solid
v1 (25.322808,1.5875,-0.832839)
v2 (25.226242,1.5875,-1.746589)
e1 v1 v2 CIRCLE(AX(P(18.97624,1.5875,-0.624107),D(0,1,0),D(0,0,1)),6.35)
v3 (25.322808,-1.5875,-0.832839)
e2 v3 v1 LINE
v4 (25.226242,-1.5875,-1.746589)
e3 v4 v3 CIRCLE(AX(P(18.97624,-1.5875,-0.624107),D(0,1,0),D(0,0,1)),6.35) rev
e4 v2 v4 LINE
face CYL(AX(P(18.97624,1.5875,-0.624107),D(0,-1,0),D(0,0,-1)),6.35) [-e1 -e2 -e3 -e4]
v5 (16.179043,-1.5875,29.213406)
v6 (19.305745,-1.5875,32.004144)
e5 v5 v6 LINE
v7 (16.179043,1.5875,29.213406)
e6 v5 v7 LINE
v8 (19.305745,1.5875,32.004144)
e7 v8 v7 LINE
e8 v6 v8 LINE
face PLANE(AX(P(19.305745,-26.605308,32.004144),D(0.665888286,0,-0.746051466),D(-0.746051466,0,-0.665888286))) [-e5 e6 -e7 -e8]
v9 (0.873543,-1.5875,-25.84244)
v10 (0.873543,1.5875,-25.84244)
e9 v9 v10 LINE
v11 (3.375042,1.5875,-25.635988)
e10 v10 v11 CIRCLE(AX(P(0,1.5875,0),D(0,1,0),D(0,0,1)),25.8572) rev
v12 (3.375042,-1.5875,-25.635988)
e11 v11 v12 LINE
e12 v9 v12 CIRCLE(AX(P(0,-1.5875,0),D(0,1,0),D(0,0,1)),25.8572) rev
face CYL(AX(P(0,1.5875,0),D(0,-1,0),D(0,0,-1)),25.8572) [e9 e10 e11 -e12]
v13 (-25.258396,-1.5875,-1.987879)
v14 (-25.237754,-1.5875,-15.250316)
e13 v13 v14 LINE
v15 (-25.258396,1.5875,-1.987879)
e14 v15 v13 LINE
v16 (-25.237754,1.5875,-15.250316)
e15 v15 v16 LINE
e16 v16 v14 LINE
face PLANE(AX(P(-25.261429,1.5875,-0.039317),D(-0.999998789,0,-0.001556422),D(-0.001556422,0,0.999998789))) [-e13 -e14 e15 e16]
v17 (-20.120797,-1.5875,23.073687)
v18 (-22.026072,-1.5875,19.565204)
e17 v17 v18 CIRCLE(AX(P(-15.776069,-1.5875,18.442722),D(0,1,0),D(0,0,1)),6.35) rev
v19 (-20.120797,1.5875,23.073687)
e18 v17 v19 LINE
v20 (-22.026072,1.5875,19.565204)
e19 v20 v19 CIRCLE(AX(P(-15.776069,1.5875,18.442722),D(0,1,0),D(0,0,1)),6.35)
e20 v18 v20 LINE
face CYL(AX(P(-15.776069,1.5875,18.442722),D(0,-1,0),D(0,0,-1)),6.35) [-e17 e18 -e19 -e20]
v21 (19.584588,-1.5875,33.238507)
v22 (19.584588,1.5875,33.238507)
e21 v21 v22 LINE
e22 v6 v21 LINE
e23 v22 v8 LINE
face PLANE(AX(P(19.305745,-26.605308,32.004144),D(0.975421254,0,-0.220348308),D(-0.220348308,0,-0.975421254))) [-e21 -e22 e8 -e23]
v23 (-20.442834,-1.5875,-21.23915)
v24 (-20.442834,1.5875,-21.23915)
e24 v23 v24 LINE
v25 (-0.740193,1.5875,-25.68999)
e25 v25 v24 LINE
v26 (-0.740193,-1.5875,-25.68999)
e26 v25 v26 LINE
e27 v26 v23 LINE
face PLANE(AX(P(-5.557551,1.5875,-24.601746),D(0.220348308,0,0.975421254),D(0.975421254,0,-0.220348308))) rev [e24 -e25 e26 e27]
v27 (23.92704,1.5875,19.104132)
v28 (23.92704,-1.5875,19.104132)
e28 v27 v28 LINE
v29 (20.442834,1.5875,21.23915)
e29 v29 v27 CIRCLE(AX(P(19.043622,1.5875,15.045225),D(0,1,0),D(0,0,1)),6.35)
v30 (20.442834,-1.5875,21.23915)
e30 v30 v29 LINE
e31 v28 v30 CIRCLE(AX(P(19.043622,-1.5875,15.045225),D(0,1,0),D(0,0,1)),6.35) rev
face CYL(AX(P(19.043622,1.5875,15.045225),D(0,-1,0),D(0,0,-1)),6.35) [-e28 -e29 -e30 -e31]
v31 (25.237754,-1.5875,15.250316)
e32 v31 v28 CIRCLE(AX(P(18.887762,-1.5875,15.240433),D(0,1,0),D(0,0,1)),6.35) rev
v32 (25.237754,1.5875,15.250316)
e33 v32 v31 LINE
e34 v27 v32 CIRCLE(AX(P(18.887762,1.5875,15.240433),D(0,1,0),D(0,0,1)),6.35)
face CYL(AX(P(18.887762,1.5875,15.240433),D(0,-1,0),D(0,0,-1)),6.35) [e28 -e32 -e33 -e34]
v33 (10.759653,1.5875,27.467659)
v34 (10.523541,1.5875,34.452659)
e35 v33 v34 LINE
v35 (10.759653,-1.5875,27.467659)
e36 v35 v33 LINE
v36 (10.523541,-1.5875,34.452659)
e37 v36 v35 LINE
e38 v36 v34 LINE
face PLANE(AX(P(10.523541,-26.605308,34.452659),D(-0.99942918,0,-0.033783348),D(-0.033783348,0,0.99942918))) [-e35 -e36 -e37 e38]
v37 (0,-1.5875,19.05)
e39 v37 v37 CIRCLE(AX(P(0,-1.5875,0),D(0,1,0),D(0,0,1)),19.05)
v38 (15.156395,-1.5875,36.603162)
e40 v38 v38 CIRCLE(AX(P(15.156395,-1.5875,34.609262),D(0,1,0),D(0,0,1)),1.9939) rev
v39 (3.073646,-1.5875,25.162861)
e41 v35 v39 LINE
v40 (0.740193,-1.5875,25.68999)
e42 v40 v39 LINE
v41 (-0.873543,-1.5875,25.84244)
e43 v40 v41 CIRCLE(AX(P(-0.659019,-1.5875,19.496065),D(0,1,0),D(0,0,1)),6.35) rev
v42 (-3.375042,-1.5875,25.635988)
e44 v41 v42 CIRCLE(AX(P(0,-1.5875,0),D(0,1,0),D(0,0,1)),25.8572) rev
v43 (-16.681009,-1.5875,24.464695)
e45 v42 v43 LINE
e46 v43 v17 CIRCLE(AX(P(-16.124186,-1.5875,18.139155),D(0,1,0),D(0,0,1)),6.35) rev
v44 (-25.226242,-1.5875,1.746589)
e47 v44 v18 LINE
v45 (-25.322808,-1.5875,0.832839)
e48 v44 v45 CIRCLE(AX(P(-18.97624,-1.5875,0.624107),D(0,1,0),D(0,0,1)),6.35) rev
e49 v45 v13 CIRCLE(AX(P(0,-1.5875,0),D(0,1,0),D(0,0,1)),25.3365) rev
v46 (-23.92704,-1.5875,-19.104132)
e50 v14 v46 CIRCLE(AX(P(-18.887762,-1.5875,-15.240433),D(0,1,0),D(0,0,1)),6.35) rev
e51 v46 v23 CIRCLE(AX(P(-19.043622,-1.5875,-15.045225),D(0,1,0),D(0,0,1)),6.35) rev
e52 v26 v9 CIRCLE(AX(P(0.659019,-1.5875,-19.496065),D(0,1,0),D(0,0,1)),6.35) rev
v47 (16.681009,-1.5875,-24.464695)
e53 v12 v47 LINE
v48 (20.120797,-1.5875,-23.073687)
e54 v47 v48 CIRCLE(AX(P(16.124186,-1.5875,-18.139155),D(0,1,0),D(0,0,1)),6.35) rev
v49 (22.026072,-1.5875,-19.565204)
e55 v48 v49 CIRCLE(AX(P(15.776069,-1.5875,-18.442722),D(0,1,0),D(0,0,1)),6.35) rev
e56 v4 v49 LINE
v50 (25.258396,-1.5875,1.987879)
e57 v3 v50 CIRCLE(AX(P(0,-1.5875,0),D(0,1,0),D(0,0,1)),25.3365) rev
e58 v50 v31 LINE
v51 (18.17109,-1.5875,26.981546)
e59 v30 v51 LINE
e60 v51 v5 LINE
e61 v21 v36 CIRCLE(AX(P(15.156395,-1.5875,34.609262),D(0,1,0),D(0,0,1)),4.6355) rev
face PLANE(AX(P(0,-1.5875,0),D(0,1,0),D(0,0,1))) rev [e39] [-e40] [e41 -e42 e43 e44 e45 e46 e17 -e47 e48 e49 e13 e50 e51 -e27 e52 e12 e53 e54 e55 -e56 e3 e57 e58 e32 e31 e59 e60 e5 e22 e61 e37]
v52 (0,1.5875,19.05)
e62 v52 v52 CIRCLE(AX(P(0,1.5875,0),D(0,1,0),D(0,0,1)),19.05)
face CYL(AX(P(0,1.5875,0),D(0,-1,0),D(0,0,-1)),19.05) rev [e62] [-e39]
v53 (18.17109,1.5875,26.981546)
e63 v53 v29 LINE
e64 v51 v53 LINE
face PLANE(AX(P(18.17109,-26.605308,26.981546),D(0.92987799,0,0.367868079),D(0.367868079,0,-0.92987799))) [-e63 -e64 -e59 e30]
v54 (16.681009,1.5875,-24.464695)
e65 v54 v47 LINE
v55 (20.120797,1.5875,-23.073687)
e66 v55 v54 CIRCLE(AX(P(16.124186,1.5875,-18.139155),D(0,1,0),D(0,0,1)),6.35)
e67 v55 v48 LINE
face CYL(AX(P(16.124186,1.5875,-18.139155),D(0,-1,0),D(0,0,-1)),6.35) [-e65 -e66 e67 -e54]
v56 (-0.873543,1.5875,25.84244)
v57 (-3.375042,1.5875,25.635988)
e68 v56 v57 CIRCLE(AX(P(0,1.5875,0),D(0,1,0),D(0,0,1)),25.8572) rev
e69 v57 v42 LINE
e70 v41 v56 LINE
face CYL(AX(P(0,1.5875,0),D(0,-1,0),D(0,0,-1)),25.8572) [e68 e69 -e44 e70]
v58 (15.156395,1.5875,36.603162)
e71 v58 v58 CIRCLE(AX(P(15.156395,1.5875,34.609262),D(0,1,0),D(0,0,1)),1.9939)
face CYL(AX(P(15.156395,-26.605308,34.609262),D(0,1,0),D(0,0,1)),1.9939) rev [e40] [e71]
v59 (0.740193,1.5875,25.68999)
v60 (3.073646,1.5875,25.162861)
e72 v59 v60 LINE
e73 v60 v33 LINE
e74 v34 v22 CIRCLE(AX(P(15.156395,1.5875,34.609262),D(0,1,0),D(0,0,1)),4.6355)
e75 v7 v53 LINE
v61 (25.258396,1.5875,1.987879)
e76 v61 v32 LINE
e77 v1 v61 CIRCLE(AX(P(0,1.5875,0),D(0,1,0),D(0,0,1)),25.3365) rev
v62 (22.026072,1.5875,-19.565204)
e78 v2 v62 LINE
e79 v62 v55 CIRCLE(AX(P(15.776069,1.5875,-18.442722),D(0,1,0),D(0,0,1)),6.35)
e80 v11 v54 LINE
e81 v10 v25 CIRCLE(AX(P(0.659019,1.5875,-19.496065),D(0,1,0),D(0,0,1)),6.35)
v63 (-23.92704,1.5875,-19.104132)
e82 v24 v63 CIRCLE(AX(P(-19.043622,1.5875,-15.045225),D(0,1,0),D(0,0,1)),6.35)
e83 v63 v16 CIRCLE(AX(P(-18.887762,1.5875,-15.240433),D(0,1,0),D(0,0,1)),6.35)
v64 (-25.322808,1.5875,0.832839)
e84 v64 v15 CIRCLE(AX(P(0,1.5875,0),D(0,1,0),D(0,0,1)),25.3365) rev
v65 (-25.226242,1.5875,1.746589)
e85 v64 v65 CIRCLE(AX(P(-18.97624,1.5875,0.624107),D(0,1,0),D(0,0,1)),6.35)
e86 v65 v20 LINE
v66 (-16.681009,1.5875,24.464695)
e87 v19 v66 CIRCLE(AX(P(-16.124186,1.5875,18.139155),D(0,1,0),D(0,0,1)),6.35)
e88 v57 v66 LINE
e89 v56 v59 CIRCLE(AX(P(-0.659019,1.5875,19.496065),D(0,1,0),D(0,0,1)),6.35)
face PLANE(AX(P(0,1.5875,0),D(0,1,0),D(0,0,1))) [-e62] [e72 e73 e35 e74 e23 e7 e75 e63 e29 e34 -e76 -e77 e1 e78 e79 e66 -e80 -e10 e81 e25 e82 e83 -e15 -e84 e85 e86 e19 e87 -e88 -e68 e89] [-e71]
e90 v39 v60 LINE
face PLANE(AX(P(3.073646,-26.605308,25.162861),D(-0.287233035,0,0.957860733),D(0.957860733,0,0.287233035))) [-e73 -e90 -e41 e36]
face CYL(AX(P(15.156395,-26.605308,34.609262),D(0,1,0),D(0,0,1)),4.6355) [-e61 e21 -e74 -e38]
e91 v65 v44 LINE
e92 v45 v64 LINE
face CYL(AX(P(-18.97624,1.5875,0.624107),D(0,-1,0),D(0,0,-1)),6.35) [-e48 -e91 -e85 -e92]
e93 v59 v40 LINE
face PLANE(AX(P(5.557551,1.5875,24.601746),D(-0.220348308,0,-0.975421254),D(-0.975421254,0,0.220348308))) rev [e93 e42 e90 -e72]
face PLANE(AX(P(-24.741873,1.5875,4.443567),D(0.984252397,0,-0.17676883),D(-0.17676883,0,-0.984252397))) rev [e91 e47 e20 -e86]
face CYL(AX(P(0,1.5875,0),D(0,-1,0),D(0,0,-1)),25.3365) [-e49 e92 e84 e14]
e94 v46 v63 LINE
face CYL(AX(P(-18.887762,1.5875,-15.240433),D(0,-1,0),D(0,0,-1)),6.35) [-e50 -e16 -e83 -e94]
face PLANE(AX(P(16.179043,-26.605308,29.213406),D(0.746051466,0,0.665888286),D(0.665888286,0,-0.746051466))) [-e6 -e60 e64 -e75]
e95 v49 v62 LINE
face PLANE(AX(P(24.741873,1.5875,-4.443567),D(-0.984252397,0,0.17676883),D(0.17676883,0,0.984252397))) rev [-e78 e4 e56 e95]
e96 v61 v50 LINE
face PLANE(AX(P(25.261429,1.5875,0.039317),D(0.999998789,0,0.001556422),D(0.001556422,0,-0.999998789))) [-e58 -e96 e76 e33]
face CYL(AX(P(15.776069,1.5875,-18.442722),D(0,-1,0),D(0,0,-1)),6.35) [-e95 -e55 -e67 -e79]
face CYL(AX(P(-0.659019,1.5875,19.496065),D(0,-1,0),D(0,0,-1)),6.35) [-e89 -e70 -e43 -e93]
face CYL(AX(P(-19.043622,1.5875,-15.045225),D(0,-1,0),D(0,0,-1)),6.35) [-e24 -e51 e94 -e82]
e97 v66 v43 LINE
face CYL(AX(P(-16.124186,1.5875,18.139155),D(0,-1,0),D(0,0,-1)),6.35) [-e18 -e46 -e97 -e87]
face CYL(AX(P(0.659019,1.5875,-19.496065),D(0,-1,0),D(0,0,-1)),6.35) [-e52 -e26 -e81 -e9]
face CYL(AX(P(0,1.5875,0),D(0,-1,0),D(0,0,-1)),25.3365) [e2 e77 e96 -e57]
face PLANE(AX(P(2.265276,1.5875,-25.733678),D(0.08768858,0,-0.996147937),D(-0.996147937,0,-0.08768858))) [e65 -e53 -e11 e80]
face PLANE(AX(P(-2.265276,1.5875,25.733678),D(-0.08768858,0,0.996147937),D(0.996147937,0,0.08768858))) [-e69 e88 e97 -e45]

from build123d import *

# Parameters (mm, degrees)
SKETCH1_R           = 19.05
BOSS_EXTRUDE1_DEPTH = 1.5875
FILLET1_R           = 6.35
SKETCH4_R           = 1.9939
BOSS_EXTRUDE2_DEPTH = 3.175


with BuildPart() as part:
    # Sketch1 → Boss-Extrude1 (new, symmetric)
    with BuildSketch(Plane(origin=(0, 0, 0), x_dir=(1, 0, 0), z_dir=(0, 1, 0))):
        with BuildLine():
            Line((0, 25.8572), (-22.49266633, 20.776091776))
            ThreePointArc((-22.49266633, 20.776091776), (-23.925232015, 19.108880164), (-25.234496658, 17.343189053))
            Line((-25.234496658, 17.343189053), (-25.258396026, 1.987878879))
            ThreePointArc((-25.258396026, 1.987878879), (-25.334329361, 0.331644538), (-25.301777207, -1.326009955))
            Line((-25.301777207, -1.326009955), (-21.651397508, -21.651397508))
            ThreePointArc((-21.651397508, -21.651397508), (-20.188971055, -23.021109353), (-18.640092328, -24.292241274))
            Line((-18.640092328, -24.292241274), (-3.375041857, -25.63598807))
            ThreePointArc((-3.375041857, -25.63598807), (-1.691141793, -25.80183775), (0, -25.8572))
            Line((0, -25.8572), (22.49266633, -20.776091776))
            ThreePointArc((22.49266633, -20.776091776), (23.925232015, -19.108880164), (25.234496658, -17.343189053))
            Line((25.234496658, -17.343189053), (25.258396026, -1.987878879))
            ThreePointArc((25.258396026, -1.987878879), (25.334329361, -0.331644538), (25.301777207, 1.326009955))
            Line((25.301777207, 1.326009955), (21.651397508, 21.651397508))
            ThreePointArc((21.651397508, 21.651397508), (20.188971055, 23.021109353), (18.640092328, 24.292241274))
            Line((18.640092328, 24.292241274), (3.375041857, 25.63598807))
            ThreePointArc((3.375041857, 25.63598807), (1.691141793, 25.80183775), (0, 25.8572))
        make_face()
        with Locations(Location((0, 0, 0), (0, 0, 270))):
            Circle(SKETCH1_R, mode=Mode.SUBTRACT)
    extrude(amount=BOSS_EXTRUDE1_DEPTH, both=True)

    # Fillet1
    # the kernel refuses this fillet: 6.35 mm, written as the material it takes off along each edge
    with BuildSketch(Plane(origin=(25.301777207, -2.821548673, -1.326009955), x_dir=(-0.17676882960283344, 0, -0.9842523969393442), z_dir=(0, 1, 0)), Plane(origin=(-25.301777207, -2.821548673, 1.326009955), x_dir=(0.17676882960285092, 0, 0.9842523969393412), z_dir=(0, 1, 0))) as fillet1_piece_1:
        with BuildLine():
            CenterArc((0.427308397, 6.35), FILLET1_R, 261.702105294, 8.297894706)
            ThreePointArc((-0.489122596, 0.066477562), (-0.244723196, 0.032047583), (0, 0))
            Line((0, 0), (0.427308397, 0))
        make_face()
    extrude(amount=5.643097347, mode=Mode.SUBTRACT)
    with BuildSketch(Plane(origin=(0, -3.771668691, -25.8572), x_dir=(0.9998572847598118, 0, 0.016894085140560105), z_dir=(0, 1, 0))) as fillet1_piece_2:
        with BuildLine():
            CenterArc((0.766390036, -6.349093758), FILLET1_R, 89.031994173, 14.665503243)
            Line((-0.737262724, -0.179691163), (0, 0))
            ThreePointArc((0, 0), (0.436833738, 0.003690217), (0.873667477, 0))
        make_face()
    extrude(amount=7.543337383, mode=Mode.SUBTRACT)
    with BuildSketch(Plane(origin=(-22.49266633, -7.488620609, -20.776091776), x_dir=(-0.649702048384586, 0, 0.7601889556714653), z_dir=(0, 1, 0)), Plane(origin=(22.49266633, -7.488620609, 20.776091776), x_dir=(0.6497020483845872, 0, -0.7601889556714644), z_dir=(0, 1, 0))) as fillet1_piece_3:
        with BuildLine():
            CenterArc((2.115690027, 6.345281193), FILLET1_R, 233.248632952, 38.960357221)
            Line((-1.683792582, 1.257410134), (0, 0))
            ThreePointArc((0, 0), (1.180224122, -0.022754088), (2.360448244, 0))
        make_face()
    extrude(amount=14.977241219, mode=Mode.SUBTRACT)
    with BuildSketch(Plane(origin=(-25.234496658, -7.46444532, -17.343189053), x_dir=(-0.0015564217956219107, 0, 0.9999987887748636), z_dir=(0, 1, 0)), Plane(origin=(25.234496658, -7.46444532, 17.343189053), x_dir=(0.0015564217956202159, 0, -0.9999987887748636), z_dir=(0, 1, 0))) as fillet1_piece_4:
        with BuildLine():
            CenterArc((2.092875431, 6.35), FILLET1_R, 231.189304273, 38.810695727)
            ThreePointArc((-1.886982522, 1.401946779), (-0.956950246, 0.682857958), (0, 0))
            Line((0, 0), (2.092875431, 0))
        make_face()
    extrude(amount=14.928890641, mode=Mode.SUBTRACT)
    with BuildSketch(Plane(origin=(-21.651397508, -7.539410962, 21.651397508), x_dir=(0.7340619600556395, 0, 0.6790824977860002), z_dir=(0, 1, 0))) as fillet1_piece_5:
        with BuildLine():
            CenterArc((2.133899558, 6.345199584), FILLET1_R, 232.953597243, 39.274415035)
            Line((-1.691731763, 1.276960738), (0, 0))
            ThreePointArc((0, 0), (1.190382192, -0.023147607), (2.380764385, 0))
        make_face()
    extrude(amount=15.078821924, mode=Mode.SUBTRACT)
    with BuildSketch(Plane(origin=(-18.640092328, -7.110021665, 24.292241274), x_dir=(0.9961479372781339, 0, 0.08768857996637193), z_dir=(0, 1, 0))) as fillet1_piece_6:
        with BuildLine():
            CenterArc((1.966659426, 6.35), FILLET1_R, 233.396238517, 36.603761483)
            ThreePointArc((-1.8197032, 1.252357597), (-0.92114894, 0.609763515), (0, 0))
            Line((0, 0), (1.966659426, 0))
        make_face()
    extrude(amount=14.22004333, mode=Mode.SUBTRACT)
    with BuildSketch(Plane(origin=(0, -3.771668691, 25.8572), x_dir=(0.9754212543155903, 0, -0.22034830752560894), z_dir=(0, 1, 0))) as fillet1_piece_7:
        with BuildLine():
            CenterArc((0.758844673, 6.35), FILLET1_R, 255.334496757, 14.665503243)
            ThreePointArc((-0.848819905, 0.206880711), (-0.42528378, 0.099855091), (0, 0))
            Line((0, 0), (0.758844673, 0))
        make_face()
    extrude(amount=7.543337383, mode=Mode.SUBTRACT)
    with BuildSketch(Plane(origin=(18.640092328, 7.110021665, -24.292241274), x_dir=(-0.9961479372781336, 0, -0.08768857996637594), z_dir=(0, -1, 0))) as fillet1_piece_8:
        with BuildLine():
            CenterArc((1.966659426, -6.35), FILLET1_R, 90, 36.603761483)
            ThreePointArc((-1.8197032, -1.252357597), (-0.92114894, -0.609763515), (0, 0))
            Line((0, 0), (1.966659426, 0))
        make_face()
    extrude(amount=14.22004333, mode=Mode.SUBTRACT)
    with BuildSketch(Plane(origin=(21.651397508, 7.539410962, -21.651397508), x_dir=(-0.7340619600556043, 0, -0.679082497786038), z_dir=(0, -1, 0))) as fillet1_piece_9:
        with BuildLine():
            CenterArc((2.133899558, -6.345199584), FILLET1_R, 87.771987722, 39.274415035)
            Line((-1.691731763, -1.276960738), (0, 0))
            ThreePointArc((0, 0), (1.190382192, 0.023147607), (2.380764385, 0))
        make_face()
    extrude(amount=15.078821924, mode=Mode.SUBTRACT)

    # Sketch4 → Boss-Extrude2 (add)
    with BuildSketch(Plane(origin=(0, 1.5875, 0), x_dir=(1, 0, 0), z_dir=(0, 1, 0))):
        with BuildLine():
            Line((18.171090284, -26.981546007), (20.442833543, -21.23915036))
            Line((20.442833543, -21.23915036), (16.989846709, -22.019182373))
            Line((16.989846709, -22.019182373), (11.9001109, -23.168957064))
            Line((11.9001109, -23.168957064), (3.07364609, -25.162861312))
            Line((3.07364609, -25.162861312), (10.75965287, -27.467658849))
            Line((10.75965287, -27.467658849), (10.523541405, -34.452658849))
            ThreePointArc((10.523541405, -34.452658849), (15.772035547, -39.203698132), (19.584588194, -33.238506824))
            Line((19.584588194, -33.238506824), (19.305744856, -32.004144185))
            Line((19.305744856, -32.004144185), (16.179043161, -29.213406378))
            Line((16.179043161, -29.213406378), (18.171090284, -26.981546007))
        make_face()
        with Locations(Location((15.156395368, -34.609261559, 0), (0, 0, 270))):
            Circle(SKETCH4_R, mode=Mode.SUBTRACT)
    extrude(amount=-BOSS_EXTRUDE2_DEPTH)


solid = part.part
